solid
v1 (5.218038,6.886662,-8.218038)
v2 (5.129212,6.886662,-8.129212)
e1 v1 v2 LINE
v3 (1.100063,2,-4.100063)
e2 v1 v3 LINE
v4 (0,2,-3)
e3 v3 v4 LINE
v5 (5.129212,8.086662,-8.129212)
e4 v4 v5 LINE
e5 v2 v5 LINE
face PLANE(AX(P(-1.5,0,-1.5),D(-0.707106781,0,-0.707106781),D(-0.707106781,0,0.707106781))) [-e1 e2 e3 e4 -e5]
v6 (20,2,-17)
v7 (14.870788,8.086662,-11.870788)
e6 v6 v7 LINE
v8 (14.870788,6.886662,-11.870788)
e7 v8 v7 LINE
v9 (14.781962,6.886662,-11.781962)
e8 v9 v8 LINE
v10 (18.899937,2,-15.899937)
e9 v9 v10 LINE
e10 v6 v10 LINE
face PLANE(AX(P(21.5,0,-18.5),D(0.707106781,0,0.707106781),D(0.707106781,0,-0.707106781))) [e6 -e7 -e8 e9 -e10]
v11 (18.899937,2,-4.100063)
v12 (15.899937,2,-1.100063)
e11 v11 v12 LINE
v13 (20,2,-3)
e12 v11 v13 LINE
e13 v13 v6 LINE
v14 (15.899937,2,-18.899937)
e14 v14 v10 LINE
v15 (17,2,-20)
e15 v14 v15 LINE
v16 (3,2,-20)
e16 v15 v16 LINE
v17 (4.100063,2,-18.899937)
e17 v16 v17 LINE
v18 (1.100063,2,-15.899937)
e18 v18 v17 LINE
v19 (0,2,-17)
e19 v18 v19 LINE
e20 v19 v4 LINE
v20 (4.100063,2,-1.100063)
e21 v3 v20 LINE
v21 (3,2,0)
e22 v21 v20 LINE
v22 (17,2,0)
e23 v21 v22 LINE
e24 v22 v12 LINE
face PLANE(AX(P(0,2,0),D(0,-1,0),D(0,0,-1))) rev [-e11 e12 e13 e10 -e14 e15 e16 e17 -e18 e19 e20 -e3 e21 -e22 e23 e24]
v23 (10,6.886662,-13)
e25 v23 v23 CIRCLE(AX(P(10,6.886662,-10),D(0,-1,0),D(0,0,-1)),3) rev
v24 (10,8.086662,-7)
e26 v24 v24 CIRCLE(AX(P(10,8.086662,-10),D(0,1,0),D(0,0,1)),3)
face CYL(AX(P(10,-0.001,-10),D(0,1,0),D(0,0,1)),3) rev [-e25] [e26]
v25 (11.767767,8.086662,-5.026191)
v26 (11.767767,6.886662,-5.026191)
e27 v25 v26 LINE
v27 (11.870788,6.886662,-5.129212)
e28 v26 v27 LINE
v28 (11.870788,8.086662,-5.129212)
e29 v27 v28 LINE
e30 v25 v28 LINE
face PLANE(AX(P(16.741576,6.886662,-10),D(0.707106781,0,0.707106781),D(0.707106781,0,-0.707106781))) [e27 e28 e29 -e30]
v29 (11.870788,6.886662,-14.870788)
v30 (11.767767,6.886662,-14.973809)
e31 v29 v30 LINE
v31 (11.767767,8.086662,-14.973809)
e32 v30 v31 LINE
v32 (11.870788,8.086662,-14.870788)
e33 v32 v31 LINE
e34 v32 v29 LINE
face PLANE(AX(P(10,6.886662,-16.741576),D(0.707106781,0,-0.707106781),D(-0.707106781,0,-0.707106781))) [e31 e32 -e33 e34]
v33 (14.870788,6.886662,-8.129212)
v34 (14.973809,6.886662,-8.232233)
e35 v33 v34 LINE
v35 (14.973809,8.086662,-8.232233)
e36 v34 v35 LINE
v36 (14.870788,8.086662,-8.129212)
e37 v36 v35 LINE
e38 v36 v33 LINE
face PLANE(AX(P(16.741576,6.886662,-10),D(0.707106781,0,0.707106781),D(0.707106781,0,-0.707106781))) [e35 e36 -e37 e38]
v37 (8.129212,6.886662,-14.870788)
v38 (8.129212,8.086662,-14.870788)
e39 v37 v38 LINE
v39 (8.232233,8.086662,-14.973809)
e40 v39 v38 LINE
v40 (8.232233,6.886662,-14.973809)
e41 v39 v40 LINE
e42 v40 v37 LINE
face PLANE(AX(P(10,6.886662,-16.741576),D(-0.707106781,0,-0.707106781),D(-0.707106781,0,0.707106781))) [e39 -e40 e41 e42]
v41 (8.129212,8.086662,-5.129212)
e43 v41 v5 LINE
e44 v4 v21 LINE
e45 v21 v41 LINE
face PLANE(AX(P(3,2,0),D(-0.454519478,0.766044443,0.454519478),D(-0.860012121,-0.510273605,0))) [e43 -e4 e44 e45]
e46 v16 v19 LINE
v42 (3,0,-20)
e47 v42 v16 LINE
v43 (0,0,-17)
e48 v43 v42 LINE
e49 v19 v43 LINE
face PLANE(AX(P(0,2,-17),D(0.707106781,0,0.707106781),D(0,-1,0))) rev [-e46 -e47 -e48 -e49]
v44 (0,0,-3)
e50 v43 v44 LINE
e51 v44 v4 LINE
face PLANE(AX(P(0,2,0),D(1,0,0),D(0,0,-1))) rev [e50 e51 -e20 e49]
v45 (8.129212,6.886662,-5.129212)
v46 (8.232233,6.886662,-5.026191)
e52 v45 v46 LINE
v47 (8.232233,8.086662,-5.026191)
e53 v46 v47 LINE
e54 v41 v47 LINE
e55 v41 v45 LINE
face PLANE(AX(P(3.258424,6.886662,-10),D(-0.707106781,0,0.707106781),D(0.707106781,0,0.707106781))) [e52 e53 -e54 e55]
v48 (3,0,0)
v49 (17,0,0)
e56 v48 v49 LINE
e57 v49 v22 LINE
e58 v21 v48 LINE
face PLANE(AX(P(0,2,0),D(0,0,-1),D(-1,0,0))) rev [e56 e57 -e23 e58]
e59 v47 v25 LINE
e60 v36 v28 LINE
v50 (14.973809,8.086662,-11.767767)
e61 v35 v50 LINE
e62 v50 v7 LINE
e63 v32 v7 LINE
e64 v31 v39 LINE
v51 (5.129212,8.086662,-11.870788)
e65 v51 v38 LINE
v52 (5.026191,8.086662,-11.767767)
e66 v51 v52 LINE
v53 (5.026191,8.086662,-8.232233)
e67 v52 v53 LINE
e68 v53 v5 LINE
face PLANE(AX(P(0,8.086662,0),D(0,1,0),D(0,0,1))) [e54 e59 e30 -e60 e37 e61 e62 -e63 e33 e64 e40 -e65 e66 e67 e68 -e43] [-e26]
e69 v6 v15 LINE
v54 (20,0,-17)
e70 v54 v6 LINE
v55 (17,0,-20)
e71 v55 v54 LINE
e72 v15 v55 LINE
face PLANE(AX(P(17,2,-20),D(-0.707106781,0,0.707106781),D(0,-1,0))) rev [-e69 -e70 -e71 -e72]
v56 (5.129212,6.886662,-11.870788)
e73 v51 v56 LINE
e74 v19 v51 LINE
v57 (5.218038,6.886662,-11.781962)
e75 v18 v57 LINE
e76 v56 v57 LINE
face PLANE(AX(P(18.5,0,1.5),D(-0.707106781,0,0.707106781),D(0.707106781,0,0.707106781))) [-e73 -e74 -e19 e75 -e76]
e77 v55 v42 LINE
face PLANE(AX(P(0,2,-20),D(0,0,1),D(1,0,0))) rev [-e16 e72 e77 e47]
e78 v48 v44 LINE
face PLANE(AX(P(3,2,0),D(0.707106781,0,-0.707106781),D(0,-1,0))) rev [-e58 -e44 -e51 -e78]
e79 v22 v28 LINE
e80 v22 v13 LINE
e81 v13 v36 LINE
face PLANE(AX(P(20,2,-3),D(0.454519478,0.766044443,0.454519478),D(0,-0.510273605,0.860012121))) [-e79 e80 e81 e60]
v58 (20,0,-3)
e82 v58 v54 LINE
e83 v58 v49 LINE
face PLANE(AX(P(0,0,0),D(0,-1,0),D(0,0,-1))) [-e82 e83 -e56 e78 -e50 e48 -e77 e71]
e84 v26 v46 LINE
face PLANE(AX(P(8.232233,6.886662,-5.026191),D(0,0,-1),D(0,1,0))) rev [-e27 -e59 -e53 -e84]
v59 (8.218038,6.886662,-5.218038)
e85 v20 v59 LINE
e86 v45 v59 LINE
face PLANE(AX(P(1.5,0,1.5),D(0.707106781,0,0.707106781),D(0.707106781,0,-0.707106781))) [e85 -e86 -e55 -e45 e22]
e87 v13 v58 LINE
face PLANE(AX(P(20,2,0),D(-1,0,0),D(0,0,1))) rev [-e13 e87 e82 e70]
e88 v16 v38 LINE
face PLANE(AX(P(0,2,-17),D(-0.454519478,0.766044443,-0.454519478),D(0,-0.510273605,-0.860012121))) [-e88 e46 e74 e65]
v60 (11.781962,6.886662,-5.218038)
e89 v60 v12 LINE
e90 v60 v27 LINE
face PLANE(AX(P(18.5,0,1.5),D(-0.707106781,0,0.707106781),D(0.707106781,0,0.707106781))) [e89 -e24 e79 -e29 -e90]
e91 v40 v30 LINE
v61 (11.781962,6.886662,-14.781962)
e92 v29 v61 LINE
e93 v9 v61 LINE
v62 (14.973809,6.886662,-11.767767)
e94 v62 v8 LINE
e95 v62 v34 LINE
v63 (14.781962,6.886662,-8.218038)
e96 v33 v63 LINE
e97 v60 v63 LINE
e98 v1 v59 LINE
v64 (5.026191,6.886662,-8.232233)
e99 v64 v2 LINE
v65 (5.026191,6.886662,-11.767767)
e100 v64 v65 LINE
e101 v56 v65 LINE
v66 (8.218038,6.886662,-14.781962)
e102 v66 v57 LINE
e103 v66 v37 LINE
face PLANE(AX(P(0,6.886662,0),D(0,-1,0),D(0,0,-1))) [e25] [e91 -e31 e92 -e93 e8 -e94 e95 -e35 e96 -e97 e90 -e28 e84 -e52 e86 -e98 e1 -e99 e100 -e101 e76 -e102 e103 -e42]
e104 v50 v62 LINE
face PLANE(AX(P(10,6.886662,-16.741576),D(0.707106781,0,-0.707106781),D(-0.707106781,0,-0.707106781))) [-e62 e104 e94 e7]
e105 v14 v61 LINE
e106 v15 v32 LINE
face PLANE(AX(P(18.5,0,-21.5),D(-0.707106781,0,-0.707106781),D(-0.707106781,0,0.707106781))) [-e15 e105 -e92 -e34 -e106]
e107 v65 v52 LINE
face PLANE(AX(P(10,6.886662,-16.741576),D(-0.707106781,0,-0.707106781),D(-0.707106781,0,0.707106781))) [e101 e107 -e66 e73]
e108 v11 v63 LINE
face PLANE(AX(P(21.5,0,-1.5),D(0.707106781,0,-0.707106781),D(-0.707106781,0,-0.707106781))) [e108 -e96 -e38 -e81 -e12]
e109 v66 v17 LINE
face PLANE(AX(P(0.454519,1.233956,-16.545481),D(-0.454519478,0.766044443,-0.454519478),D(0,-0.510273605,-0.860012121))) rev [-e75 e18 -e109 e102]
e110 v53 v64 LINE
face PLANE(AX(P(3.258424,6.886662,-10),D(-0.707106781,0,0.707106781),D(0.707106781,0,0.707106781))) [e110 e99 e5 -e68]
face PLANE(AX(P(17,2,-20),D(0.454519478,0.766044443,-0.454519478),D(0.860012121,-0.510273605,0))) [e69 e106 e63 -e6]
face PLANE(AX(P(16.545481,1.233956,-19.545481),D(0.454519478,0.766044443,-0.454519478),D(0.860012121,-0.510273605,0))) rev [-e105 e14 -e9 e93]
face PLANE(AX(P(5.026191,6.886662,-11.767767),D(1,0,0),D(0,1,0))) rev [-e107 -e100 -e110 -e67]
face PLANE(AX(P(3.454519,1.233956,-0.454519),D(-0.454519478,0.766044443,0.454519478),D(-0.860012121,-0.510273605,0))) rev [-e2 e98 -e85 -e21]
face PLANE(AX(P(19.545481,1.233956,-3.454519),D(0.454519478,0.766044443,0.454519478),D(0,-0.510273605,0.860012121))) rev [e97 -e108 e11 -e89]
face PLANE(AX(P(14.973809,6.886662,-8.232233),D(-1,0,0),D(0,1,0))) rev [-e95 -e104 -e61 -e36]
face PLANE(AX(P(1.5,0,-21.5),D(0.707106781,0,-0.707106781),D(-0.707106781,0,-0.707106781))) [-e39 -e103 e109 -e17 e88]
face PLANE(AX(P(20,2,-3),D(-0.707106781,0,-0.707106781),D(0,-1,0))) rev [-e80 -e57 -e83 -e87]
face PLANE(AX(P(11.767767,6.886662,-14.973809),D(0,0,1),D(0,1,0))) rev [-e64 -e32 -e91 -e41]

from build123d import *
from build123d.topology import SkipClean

# Parameters (mm, degrees)
SKETCH1_W               = 20
SKETCH1_H               = 20
BOSS_EXTRUDE1_DEPTH     = 2
CHAMFER1_SIZE           = 3
EXTRUDE_THIN1_DEPTH     = 14.142136
CUT_EXTRUDE1_DEPTH      = 9.899495
CIRPATTERN5_START       = -2.121320344
CIRPATTERN5_DEPTH       = 4.242640688
CIRPATTERN5_START_2     = 12.02081528
CIRPATTERN5_2_DEPTH     = 4.242640687
CIRPATTERN5_START_3     = 2.121320344
CIRPATTERN5_3_OUTLINE_W = 4.242640688
CIRPATTERN5_3_OUTLINE_H = 2
CIRPATTERN5_3_DEPTH     = 9.899494936
SKETCH7_W               = 24.04163056
SKETCH7_H               = 24.04163056
CUT_EXTRUDE2_DEPTH      = 4
BOSS_EXTRUDE2_DEPTH     = 1.2
CHAMFER5_SIZE           = 2.5
CUT_EXTRUDE3_REACH      = 31.418
SKETCH10_R              = 3


with BuildPart() as part:
    # Sketch1 → Boss-Extrude1 (new body)
    with BuildSketch(Plane(origin=(0, 0, 0), x_dir=(1, 0, 0), z_dir=(0, 1, 0))):
        with Locations((10, 10)):
            Rectangle(SKETCH1_W, SKETCH1_H)
    extrude(amount=BOSS_EXTRUDE1_DEPTH)

    # Chamfer1
    chamfer1_edges = [part.edges().sort_by_distance(p)[0] for p in [
        (0, 1, -20),
        (20, 1, -20),
        (20, 1, 0),
        (0, 1, 0),
    ]]
    chamfer(chamfer1_edges, length=CHAMFER1_SIZE)



with BuildPart() as body_2:
    # Sketch3 → Extrude-Thin1 (new body)
    with BuildSketch(Plane(origin=(-8.5, 0, -8.5), x_dir=(-0.7071067811865488, 0, 0.7071067811865464), z_dir=(-0.7071067811865464, 0, -0.7071067811865488))):
        Polygon((-2.121320344, 2), (-14.142135624, 12.086661668), (-14.784923233, 11.320617225), (-2.764107953, 1.233955557), align=None)
    extrude(amount=-EXTRUDE_THIN1_DEPTH)

    # Sketch5 → Cut-Extrude1 (cut)
    with BuildSketch(Plane(origin=(-8.5, 0, -8.5), x_dir=(-0.7071067811865488, 0, 0.7071067811865462), z_dir=(-0.7071067811865462, 0, -0.7071067811865488))):
        Polygon((-2.121320344, 2), (-14.142135624, 12.086661668), (-14.784923233, 11.320617225), (-2.764107953, 1.233955557), align=None)
    extrude(amount=-CUT_EXTRUDE1_DEPTH, mode=Mode.SUBTRACT)


with BuildPart() as part_1:
    # CirPattern5: read off the stored shape, not the designer's step
    with SkipClean():  # the faces are left unmerged after this step: merging them gives an invalid solid
        add(part.part)

        add(body_2.part)  # CirPattern5 merges body 2
        # CirPattern5 outline → CirPattern5 (add)
        with BuildSketch(Plane(origin=(0, 0, 0), x_dir=(0.707106781186549, 0, -0.707106781186546), z_dir=(0.707106781186546, 0, 0.707106781186549)).offset(CIRPATTERN5_START)):
            Polygon((14.142135624, 10.781254379), (24.607227077, 2), (26.162950904, 2), (16.263455967, 10.306662551), (14.142135624, 12.086661668), (14.784923233, 11.320617225), align=None)
        extrude(amount=CIRPATTERN5_DEPTH)

    # CirPattern5 2 outline → CirPattern5 2 (add)
    with SkipClean():  # the faces are left unmerged after this step: merging them gives an invalid solid
        with BuildSketch(Plane(origin=(0, 0, 0), x_dir=(0.7071067811865541, 0, 0.707106781186541), z_dir=(0.707106781186541, 0, -0.707106781186554)).offset(CIRPATTERN5_START_2)):
            Polygon((0, -10.781254379), (-10.465091453, -2), (-12.02081528, -2), (-2.121320344, -10.30666255), (0, -12.086661668), (2.121320344, -10.30666255), (12.02081528, -2), (10.465091453, -2), align=None)
        extrude(amount=CIRPATTERN5_2_DEPTH)

    # CirPattern5 3 outline → CirPattern5 3 (add)
    with SkipClean():  # the faces are left unmerged after this step: merging them gives an invalid solid
        with BuildSketch(Plane(origin=(0, 0, 0), x_dir=(0.7071067811865541, 0, 0.707106781186541), z_dir=(0.707106781186541, 0, -0.707106781186554)).offset(CIRPATTERN5_START_3)):
            with Locations((0, -1)):
                Rectangle(CIRPATTERN5_3_OUTLINE_W, CIRPATTERN5_3_OUTLINE_H)
        extrude(amount=CIRPATTERN5_3_DEPTH)

    # Sketch7 → Cut-Extrude2 (cut)
    with BuildSketch(Plane(origin=(0, 12.086661668, 0), x_dir=(-0.7071067811865464, 0, -0.7071067811865488), z_dir=(0, 1, 0))):
        with Locations((0, -14.142135624)):
            Rectangle(SKETCH7_W, SKETCH7_H)
    extrude(amount=-CUT_EXTRUDE2_DEPTH, mode=Mode.SUBTRACT)

    # Sketch9 → Boss-Extrude2 (add)
    with BuildSketch(Plane(origin=(0, 8.086661668, 0), x_dir=(1, 0, 0), z_dir=(0, 1, 0))):
        Polygon((10, 16.741576375), (3.258423625, 10), (10, 3.258423625), (16.741576375, 10), align=None)
    extrude(amount=-BOSS_EXTRUDE2_DEPTH)

    # Chamfer5
    chamfer5_edges = [part_1.edges().sort_by_distance(p)[0] for p in [
        (10, 7.486661668, -3.258423625),
        (10, 7.486661668, -16.741576375),
        (16.741576375, 7.486661668, -10),
        (3.258423625, 7.486661668, -10),
    ]]
    chamfer(chamfer5_edges, length=CHAMFER5_SIZE)

    # Sketch10 → Cut-Extrude3 (cut, up to next)
    with BuildSketch(Plane(origin=(0, 8.086661668, 0), x_dir=(1, 0, 0), z_dir=(0, 1, 0)), mode=Mode.PRIVATE) as cut_extrude3_sk1:
        with Locations(Location((10, 10, 0), (0, 0, 270))):
            Circle(SKETCH10_R)
    cut_extrude3_tool1 = extrude(cut_extrude3_sk1.sketch, amount=-CUT_EXTRUDE3_REACH, mode=Mode.PRIVATE) & part_1.part
    add(cut_extrude3_tool1.solids().sort_by_distance((10, 8.086662, -10))[0], mode=Mode.SUBTRACT)


solid = part_1.part
